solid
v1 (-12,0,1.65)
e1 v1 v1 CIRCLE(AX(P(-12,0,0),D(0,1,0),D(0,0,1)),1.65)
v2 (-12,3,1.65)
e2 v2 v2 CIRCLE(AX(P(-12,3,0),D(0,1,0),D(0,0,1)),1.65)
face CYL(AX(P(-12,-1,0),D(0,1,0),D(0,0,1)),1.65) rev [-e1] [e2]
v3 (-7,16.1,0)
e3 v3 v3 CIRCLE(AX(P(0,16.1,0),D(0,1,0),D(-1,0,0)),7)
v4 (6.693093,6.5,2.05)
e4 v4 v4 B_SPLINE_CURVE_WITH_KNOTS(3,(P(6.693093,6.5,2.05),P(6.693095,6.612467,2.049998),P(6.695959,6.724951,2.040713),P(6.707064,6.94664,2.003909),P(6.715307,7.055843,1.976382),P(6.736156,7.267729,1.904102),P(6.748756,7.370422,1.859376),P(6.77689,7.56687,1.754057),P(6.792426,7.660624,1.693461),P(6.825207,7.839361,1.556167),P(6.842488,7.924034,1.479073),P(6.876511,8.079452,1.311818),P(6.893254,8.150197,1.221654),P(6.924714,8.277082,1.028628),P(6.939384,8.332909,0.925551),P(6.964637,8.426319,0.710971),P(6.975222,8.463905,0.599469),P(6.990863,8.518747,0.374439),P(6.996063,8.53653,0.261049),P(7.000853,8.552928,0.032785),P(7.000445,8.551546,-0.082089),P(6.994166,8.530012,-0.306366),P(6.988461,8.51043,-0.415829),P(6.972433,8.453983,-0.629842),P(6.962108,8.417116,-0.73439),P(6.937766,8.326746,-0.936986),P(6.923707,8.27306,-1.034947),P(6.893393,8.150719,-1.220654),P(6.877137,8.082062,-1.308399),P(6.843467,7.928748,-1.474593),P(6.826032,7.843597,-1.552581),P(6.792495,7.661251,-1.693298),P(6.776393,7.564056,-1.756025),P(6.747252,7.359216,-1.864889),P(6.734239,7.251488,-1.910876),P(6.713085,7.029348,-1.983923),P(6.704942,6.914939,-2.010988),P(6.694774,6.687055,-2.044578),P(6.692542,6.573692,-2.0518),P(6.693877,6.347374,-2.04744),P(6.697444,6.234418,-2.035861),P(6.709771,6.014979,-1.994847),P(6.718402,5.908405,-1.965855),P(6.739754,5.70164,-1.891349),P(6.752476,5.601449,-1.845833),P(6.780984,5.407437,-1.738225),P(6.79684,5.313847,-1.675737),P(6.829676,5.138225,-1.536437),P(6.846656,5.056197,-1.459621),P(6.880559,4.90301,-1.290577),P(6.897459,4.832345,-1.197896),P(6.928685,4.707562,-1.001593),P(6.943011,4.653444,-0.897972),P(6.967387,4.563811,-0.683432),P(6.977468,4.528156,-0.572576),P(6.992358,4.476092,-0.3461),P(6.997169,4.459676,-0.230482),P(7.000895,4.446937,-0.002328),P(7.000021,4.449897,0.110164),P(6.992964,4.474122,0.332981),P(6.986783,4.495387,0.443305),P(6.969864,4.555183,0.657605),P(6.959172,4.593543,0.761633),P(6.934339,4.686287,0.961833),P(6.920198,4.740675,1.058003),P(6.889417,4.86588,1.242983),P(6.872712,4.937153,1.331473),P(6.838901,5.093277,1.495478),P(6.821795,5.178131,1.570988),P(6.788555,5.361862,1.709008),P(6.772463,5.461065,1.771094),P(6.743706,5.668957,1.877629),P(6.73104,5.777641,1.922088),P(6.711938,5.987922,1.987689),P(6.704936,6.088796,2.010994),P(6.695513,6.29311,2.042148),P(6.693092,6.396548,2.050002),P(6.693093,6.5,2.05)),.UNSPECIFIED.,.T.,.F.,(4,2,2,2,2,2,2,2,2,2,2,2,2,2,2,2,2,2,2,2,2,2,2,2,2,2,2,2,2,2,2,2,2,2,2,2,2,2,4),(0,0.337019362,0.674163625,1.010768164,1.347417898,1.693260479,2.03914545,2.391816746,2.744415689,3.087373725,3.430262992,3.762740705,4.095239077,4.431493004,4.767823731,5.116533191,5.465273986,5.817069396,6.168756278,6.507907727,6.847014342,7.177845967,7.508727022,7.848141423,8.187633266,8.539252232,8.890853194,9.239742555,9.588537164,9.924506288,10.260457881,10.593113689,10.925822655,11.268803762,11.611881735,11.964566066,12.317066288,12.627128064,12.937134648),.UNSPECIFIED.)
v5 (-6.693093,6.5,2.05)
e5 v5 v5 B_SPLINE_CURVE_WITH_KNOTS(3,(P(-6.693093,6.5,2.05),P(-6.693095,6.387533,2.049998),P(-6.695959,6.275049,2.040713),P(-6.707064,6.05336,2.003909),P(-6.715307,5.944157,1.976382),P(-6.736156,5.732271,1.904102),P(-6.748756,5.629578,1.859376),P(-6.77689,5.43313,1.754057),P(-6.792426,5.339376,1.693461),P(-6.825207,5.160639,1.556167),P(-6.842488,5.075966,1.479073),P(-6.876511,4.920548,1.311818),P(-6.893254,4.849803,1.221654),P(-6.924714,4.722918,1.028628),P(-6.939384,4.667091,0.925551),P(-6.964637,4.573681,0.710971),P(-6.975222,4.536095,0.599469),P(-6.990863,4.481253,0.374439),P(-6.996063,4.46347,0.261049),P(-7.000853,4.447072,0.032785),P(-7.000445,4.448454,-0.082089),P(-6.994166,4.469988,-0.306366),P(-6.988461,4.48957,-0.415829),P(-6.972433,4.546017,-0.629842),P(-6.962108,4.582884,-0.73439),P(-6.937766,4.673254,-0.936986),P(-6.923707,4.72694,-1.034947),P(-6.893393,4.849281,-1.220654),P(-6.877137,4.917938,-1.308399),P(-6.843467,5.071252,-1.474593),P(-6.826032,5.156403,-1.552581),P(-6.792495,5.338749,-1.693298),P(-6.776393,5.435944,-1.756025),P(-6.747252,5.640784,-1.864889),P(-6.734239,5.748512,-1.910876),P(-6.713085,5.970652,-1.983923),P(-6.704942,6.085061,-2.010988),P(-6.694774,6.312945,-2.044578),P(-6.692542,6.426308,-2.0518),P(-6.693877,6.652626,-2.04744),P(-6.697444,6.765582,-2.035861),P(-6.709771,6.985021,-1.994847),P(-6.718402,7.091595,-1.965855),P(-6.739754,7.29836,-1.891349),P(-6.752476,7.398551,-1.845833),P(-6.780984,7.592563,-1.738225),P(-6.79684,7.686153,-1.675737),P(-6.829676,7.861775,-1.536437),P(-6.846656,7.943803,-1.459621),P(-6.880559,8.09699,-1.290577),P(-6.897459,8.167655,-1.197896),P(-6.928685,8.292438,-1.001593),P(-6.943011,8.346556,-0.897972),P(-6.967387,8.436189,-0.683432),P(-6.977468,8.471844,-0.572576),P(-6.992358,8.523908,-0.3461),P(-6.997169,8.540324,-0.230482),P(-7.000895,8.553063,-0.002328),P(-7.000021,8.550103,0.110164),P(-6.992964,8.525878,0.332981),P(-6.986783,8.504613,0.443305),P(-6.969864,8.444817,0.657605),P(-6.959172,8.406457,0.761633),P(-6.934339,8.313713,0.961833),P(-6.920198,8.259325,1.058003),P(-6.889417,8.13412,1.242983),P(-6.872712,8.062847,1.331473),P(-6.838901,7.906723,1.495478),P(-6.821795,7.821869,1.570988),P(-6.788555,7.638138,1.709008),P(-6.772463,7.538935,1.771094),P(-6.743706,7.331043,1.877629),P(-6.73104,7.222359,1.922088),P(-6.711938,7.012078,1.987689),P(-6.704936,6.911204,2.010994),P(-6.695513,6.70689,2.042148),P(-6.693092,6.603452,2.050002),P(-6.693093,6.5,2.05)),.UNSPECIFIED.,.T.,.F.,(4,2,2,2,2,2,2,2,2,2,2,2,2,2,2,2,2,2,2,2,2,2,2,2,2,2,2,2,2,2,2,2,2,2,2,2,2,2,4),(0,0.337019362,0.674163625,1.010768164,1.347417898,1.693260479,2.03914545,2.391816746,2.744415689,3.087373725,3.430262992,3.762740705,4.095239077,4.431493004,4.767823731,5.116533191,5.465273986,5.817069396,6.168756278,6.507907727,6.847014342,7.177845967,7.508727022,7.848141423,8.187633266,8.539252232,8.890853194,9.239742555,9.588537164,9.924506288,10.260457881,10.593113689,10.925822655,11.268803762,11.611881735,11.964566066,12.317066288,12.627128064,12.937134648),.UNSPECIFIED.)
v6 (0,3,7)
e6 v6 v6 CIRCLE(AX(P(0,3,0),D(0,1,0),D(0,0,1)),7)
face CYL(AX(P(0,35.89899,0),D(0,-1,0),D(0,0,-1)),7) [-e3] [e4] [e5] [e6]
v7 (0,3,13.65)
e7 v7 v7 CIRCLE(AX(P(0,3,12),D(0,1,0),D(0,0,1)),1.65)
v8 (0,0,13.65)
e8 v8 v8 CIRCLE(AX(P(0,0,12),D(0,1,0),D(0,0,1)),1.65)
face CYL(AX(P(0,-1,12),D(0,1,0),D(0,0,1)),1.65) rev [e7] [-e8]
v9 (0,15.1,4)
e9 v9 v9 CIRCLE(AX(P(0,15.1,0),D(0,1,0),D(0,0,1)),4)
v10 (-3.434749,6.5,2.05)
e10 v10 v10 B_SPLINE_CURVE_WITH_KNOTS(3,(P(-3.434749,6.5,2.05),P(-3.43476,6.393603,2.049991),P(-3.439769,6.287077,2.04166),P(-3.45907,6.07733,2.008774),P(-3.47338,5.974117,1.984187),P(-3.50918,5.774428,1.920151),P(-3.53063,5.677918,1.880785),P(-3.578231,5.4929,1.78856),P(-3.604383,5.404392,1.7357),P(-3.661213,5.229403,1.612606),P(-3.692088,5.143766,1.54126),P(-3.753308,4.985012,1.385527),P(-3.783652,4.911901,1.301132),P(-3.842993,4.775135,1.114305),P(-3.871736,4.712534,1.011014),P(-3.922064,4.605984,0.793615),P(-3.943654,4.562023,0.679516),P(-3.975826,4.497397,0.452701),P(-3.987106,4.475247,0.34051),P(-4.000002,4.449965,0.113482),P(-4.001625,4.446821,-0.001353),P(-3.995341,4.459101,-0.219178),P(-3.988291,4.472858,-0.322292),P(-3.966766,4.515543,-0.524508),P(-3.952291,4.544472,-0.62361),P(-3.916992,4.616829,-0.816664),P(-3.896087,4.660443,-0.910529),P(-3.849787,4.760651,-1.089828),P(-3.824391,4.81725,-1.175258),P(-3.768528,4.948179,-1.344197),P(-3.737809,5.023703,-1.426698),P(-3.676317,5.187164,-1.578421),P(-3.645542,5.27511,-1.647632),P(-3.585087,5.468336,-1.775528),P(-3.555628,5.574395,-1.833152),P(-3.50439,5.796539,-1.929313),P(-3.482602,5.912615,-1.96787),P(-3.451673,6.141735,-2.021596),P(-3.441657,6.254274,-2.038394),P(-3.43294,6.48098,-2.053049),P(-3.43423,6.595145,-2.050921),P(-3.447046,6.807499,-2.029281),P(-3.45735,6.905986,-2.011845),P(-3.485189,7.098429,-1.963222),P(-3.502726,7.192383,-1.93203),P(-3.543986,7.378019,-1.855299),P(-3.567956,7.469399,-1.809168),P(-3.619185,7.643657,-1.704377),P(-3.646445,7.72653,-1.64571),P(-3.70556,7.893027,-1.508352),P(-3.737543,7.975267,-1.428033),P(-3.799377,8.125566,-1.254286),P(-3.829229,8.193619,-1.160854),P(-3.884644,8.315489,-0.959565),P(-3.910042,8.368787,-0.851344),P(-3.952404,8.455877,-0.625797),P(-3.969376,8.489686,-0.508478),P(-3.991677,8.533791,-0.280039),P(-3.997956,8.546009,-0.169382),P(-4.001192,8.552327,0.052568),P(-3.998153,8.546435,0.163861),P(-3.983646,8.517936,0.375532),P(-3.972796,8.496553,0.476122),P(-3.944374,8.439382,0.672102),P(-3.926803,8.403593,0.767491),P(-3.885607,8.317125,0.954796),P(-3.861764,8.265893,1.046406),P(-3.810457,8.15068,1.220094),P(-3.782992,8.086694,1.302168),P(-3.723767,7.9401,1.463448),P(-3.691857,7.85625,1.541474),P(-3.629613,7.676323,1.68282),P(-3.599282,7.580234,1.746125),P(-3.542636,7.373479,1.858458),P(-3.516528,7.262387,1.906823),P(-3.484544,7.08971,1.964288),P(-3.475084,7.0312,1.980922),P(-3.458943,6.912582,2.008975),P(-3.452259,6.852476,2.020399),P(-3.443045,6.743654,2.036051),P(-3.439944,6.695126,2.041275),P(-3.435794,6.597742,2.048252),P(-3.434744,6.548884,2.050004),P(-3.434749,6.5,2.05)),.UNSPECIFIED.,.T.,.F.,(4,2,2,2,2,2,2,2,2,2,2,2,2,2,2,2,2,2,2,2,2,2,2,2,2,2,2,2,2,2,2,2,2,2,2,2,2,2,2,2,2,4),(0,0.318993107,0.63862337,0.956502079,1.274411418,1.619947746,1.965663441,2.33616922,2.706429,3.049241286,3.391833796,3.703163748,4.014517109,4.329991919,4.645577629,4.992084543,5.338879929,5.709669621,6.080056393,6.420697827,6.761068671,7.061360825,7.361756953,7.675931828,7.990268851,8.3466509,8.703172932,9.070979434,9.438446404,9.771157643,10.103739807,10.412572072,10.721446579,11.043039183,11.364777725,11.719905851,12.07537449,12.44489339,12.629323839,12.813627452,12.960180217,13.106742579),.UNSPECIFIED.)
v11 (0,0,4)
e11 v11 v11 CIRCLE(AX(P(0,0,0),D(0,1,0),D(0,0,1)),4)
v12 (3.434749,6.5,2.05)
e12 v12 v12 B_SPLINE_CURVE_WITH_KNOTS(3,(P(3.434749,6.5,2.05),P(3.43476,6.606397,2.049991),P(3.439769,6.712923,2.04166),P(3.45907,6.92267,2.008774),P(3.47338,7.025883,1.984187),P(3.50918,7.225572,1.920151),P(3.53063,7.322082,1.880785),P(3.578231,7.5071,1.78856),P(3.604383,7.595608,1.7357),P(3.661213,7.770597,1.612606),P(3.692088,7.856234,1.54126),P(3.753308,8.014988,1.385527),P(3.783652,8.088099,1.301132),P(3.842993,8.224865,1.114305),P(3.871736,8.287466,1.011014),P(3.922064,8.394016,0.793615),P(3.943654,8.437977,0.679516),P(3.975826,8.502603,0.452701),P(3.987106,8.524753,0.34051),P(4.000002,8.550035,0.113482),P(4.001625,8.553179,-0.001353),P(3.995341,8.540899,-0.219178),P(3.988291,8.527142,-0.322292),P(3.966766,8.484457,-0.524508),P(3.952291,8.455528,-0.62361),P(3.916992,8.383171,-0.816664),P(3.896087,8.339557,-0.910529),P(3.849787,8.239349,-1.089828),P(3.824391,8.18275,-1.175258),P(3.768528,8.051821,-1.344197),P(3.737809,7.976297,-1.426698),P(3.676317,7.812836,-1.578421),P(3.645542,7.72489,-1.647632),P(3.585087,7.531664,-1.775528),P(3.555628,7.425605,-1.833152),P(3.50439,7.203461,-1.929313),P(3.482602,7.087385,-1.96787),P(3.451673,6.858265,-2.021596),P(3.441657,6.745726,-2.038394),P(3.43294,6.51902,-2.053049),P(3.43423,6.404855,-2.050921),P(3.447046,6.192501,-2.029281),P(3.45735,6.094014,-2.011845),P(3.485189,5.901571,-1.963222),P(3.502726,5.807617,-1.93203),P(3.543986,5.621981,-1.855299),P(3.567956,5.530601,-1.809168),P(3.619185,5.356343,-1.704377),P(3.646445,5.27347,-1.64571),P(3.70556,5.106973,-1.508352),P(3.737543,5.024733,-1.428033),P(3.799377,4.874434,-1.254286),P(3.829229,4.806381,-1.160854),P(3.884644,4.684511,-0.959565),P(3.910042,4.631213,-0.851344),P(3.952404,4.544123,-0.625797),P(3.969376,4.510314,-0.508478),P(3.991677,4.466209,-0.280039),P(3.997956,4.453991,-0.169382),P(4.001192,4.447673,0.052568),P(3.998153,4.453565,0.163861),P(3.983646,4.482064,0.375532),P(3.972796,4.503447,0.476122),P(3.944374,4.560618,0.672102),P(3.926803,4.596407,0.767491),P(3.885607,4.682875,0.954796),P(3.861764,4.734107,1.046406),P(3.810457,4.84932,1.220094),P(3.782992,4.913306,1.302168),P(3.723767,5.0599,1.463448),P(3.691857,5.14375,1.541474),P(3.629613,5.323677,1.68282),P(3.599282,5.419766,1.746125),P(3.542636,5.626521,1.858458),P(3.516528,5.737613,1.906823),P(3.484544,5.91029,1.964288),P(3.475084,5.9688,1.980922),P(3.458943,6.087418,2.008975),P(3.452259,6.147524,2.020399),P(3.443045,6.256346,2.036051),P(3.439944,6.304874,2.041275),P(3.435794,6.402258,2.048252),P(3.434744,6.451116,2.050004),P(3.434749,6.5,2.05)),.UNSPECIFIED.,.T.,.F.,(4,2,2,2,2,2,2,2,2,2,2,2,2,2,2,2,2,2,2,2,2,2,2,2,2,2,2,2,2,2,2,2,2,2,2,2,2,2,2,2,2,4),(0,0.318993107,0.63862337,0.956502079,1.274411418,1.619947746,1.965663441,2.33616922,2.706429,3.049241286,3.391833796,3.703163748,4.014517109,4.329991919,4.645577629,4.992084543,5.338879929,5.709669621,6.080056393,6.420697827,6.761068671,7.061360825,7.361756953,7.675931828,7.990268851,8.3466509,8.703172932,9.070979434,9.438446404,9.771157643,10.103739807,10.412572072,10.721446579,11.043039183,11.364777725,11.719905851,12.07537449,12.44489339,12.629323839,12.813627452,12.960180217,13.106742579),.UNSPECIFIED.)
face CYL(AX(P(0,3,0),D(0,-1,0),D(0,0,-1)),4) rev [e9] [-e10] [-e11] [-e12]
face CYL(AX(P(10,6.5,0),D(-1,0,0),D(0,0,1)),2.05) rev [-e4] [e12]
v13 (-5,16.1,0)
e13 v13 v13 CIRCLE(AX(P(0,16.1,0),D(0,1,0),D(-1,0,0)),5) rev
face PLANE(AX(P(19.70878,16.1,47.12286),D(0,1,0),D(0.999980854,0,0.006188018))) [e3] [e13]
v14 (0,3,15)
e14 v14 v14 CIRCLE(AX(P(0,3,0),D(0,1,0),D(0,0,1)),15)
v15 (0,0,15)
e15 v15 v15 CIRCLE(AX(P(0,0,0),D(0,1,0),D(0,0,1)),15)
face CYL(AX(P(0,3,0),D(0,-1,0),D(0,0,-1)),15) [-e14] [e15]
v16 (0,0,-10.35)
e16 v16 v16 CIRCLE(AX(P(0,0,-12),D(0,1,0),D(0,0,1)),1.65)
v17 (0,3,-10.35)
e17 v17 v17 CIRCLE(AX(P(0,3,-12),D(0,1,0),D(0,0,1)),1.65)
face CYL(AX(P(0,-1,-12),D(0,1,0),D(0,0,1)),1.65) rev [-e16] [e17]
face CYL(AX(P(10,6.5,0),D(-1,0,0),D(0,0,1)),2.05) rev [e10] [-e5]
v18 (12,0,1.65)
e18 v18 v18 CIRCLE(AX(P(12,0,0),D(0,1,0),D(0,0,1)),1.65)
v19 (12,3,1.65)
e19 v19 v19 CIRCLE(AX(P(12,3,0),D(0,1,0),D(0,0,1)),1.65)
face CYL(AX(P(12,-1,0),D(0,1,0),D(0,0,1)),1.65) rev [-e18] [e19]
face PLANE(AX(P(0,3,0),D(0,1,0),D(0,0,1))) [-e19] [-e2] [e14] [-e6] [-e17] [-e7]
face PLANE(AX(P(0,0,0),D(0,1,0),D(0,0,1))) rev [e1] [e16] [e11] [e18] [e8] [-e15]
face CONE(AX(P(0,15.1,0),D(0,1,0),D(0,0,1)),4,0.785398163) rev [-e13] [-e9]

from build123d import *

# Parameters (mm, degrees)
SKETCH_1_R               = 15
SKETCH_1_R_2             = 4
EXTRUDE_1_DEPTH          = 3
SKETCH_2_R               = 7
SKETCH_2_R_2             = 4
EXTRUDE_2_DEPTH          = 13.1
CUT_EXTRUDE_1_DEPTH      = 27.630996977
CUT_EXTRUDE_1_DEPTH_BACK = 10
SKETCH_5_R               = 2.05
SKETCH_7_R               = 1.65
CUT_EXTRUDE_3_DEPTH      = 4
CHAMFER_1_SIZE           = 1


with BuildPart() as part:
    # 草图1 → 凸台-拉伸1 (new body)
    with BuildSketch(Plane(origin=(0, 0, 0), x_dir=(1, 0, 0), z_dir=(0, 1, 0))):
        with Locations(Location((0, 0, 0), (0, 0, 270))):
            Circle(SKETCH_1_R)
        with Locations(Location((0, 0, 0), (0, 0, 270))):
            Circle(SKETCH_1_R_2, mode=Mode.SUBTRACT)
    extrude(amount=EXTRUDE_1_DEPTH)

    # 草图2 → 凸台-拉伸2 (add)
    with BuildSketch(Plane(origin=(0, 3, 0), x_dir=(1, 0, 0), z_dir=(0, 1, 0))):
        with Locations(Location((0, 0, 0), (0, 0, 180))):
            Circle(SKETCH_2_R)
        with Locations(Location((0, 0, 0), (0, 0, 180))):
            Circle(SKETCH_2_R_2, mode=Mode.SUBTRACT)
    extrude(amount=EXTRUDE_2_DEPTH)

    # 草图5 → 切除-拉伸1 (cut, two sides: drawn at the far end of the back side and taken through both)
    with BuildSketch(Plane.ZY.offset(-CUT_EXTRUDE_1_DEPTH_BACK)):
        with Locations((0, 6.5)):
            Circle(SKETCH_5_R)
    extrude(amount=CUT_EXTRUDE_1_DEPTH + CUT_EXTRUDE_1_DEPTH_BACK, mode=Mode.SUBTRACT)

    # 草图7 → 切除-拉伸3 (cut)
    with BuildSketch(Plane(origin=(0, 3, 0), x_dir=(1, 0, 0), z_dir=(0, 1, 0))):
        with Locations(Location((12, 0, 0), (0, 0, 270))):
            Circle(SKETCH_7_R)
        with Locations(Location((0, -12, 0), (0, 0, 270))):
            Circle(SKETCH_7_R)
        with Locations(Location((-12, 0, 0), (0, 0, 270))):
            Circle(SKETCH_7_R)
        with Locations(Location((0, 12, 0), (0, 0, 270))):
            Circle(SKETCH_7_R)
    extrude(amount=-CUT_EXTRUDE_3_DEPTH, mode=Mode.SUBTRACT)

    # 倒角1
    # the kernel refuses this chamfer: 1 mm, written as the material it takes off along each edge
    with BuildSketch(Plane(origin=(0, 16.1, 0), x_dir=(-1, 0, 0), z_dir=(0, 0, -1))) as chamfer_1_piece_1:
        Polygon((4, -CHAMFER_1_SIZE), (4 + CHAMFER_1_SIZE, 0), (4, 0), align=None)
    revolve(axis=Axis((0, 16.1, 0), (0, 1, 0)), mode=Mode.SUBTRACT)


solid = part.part
